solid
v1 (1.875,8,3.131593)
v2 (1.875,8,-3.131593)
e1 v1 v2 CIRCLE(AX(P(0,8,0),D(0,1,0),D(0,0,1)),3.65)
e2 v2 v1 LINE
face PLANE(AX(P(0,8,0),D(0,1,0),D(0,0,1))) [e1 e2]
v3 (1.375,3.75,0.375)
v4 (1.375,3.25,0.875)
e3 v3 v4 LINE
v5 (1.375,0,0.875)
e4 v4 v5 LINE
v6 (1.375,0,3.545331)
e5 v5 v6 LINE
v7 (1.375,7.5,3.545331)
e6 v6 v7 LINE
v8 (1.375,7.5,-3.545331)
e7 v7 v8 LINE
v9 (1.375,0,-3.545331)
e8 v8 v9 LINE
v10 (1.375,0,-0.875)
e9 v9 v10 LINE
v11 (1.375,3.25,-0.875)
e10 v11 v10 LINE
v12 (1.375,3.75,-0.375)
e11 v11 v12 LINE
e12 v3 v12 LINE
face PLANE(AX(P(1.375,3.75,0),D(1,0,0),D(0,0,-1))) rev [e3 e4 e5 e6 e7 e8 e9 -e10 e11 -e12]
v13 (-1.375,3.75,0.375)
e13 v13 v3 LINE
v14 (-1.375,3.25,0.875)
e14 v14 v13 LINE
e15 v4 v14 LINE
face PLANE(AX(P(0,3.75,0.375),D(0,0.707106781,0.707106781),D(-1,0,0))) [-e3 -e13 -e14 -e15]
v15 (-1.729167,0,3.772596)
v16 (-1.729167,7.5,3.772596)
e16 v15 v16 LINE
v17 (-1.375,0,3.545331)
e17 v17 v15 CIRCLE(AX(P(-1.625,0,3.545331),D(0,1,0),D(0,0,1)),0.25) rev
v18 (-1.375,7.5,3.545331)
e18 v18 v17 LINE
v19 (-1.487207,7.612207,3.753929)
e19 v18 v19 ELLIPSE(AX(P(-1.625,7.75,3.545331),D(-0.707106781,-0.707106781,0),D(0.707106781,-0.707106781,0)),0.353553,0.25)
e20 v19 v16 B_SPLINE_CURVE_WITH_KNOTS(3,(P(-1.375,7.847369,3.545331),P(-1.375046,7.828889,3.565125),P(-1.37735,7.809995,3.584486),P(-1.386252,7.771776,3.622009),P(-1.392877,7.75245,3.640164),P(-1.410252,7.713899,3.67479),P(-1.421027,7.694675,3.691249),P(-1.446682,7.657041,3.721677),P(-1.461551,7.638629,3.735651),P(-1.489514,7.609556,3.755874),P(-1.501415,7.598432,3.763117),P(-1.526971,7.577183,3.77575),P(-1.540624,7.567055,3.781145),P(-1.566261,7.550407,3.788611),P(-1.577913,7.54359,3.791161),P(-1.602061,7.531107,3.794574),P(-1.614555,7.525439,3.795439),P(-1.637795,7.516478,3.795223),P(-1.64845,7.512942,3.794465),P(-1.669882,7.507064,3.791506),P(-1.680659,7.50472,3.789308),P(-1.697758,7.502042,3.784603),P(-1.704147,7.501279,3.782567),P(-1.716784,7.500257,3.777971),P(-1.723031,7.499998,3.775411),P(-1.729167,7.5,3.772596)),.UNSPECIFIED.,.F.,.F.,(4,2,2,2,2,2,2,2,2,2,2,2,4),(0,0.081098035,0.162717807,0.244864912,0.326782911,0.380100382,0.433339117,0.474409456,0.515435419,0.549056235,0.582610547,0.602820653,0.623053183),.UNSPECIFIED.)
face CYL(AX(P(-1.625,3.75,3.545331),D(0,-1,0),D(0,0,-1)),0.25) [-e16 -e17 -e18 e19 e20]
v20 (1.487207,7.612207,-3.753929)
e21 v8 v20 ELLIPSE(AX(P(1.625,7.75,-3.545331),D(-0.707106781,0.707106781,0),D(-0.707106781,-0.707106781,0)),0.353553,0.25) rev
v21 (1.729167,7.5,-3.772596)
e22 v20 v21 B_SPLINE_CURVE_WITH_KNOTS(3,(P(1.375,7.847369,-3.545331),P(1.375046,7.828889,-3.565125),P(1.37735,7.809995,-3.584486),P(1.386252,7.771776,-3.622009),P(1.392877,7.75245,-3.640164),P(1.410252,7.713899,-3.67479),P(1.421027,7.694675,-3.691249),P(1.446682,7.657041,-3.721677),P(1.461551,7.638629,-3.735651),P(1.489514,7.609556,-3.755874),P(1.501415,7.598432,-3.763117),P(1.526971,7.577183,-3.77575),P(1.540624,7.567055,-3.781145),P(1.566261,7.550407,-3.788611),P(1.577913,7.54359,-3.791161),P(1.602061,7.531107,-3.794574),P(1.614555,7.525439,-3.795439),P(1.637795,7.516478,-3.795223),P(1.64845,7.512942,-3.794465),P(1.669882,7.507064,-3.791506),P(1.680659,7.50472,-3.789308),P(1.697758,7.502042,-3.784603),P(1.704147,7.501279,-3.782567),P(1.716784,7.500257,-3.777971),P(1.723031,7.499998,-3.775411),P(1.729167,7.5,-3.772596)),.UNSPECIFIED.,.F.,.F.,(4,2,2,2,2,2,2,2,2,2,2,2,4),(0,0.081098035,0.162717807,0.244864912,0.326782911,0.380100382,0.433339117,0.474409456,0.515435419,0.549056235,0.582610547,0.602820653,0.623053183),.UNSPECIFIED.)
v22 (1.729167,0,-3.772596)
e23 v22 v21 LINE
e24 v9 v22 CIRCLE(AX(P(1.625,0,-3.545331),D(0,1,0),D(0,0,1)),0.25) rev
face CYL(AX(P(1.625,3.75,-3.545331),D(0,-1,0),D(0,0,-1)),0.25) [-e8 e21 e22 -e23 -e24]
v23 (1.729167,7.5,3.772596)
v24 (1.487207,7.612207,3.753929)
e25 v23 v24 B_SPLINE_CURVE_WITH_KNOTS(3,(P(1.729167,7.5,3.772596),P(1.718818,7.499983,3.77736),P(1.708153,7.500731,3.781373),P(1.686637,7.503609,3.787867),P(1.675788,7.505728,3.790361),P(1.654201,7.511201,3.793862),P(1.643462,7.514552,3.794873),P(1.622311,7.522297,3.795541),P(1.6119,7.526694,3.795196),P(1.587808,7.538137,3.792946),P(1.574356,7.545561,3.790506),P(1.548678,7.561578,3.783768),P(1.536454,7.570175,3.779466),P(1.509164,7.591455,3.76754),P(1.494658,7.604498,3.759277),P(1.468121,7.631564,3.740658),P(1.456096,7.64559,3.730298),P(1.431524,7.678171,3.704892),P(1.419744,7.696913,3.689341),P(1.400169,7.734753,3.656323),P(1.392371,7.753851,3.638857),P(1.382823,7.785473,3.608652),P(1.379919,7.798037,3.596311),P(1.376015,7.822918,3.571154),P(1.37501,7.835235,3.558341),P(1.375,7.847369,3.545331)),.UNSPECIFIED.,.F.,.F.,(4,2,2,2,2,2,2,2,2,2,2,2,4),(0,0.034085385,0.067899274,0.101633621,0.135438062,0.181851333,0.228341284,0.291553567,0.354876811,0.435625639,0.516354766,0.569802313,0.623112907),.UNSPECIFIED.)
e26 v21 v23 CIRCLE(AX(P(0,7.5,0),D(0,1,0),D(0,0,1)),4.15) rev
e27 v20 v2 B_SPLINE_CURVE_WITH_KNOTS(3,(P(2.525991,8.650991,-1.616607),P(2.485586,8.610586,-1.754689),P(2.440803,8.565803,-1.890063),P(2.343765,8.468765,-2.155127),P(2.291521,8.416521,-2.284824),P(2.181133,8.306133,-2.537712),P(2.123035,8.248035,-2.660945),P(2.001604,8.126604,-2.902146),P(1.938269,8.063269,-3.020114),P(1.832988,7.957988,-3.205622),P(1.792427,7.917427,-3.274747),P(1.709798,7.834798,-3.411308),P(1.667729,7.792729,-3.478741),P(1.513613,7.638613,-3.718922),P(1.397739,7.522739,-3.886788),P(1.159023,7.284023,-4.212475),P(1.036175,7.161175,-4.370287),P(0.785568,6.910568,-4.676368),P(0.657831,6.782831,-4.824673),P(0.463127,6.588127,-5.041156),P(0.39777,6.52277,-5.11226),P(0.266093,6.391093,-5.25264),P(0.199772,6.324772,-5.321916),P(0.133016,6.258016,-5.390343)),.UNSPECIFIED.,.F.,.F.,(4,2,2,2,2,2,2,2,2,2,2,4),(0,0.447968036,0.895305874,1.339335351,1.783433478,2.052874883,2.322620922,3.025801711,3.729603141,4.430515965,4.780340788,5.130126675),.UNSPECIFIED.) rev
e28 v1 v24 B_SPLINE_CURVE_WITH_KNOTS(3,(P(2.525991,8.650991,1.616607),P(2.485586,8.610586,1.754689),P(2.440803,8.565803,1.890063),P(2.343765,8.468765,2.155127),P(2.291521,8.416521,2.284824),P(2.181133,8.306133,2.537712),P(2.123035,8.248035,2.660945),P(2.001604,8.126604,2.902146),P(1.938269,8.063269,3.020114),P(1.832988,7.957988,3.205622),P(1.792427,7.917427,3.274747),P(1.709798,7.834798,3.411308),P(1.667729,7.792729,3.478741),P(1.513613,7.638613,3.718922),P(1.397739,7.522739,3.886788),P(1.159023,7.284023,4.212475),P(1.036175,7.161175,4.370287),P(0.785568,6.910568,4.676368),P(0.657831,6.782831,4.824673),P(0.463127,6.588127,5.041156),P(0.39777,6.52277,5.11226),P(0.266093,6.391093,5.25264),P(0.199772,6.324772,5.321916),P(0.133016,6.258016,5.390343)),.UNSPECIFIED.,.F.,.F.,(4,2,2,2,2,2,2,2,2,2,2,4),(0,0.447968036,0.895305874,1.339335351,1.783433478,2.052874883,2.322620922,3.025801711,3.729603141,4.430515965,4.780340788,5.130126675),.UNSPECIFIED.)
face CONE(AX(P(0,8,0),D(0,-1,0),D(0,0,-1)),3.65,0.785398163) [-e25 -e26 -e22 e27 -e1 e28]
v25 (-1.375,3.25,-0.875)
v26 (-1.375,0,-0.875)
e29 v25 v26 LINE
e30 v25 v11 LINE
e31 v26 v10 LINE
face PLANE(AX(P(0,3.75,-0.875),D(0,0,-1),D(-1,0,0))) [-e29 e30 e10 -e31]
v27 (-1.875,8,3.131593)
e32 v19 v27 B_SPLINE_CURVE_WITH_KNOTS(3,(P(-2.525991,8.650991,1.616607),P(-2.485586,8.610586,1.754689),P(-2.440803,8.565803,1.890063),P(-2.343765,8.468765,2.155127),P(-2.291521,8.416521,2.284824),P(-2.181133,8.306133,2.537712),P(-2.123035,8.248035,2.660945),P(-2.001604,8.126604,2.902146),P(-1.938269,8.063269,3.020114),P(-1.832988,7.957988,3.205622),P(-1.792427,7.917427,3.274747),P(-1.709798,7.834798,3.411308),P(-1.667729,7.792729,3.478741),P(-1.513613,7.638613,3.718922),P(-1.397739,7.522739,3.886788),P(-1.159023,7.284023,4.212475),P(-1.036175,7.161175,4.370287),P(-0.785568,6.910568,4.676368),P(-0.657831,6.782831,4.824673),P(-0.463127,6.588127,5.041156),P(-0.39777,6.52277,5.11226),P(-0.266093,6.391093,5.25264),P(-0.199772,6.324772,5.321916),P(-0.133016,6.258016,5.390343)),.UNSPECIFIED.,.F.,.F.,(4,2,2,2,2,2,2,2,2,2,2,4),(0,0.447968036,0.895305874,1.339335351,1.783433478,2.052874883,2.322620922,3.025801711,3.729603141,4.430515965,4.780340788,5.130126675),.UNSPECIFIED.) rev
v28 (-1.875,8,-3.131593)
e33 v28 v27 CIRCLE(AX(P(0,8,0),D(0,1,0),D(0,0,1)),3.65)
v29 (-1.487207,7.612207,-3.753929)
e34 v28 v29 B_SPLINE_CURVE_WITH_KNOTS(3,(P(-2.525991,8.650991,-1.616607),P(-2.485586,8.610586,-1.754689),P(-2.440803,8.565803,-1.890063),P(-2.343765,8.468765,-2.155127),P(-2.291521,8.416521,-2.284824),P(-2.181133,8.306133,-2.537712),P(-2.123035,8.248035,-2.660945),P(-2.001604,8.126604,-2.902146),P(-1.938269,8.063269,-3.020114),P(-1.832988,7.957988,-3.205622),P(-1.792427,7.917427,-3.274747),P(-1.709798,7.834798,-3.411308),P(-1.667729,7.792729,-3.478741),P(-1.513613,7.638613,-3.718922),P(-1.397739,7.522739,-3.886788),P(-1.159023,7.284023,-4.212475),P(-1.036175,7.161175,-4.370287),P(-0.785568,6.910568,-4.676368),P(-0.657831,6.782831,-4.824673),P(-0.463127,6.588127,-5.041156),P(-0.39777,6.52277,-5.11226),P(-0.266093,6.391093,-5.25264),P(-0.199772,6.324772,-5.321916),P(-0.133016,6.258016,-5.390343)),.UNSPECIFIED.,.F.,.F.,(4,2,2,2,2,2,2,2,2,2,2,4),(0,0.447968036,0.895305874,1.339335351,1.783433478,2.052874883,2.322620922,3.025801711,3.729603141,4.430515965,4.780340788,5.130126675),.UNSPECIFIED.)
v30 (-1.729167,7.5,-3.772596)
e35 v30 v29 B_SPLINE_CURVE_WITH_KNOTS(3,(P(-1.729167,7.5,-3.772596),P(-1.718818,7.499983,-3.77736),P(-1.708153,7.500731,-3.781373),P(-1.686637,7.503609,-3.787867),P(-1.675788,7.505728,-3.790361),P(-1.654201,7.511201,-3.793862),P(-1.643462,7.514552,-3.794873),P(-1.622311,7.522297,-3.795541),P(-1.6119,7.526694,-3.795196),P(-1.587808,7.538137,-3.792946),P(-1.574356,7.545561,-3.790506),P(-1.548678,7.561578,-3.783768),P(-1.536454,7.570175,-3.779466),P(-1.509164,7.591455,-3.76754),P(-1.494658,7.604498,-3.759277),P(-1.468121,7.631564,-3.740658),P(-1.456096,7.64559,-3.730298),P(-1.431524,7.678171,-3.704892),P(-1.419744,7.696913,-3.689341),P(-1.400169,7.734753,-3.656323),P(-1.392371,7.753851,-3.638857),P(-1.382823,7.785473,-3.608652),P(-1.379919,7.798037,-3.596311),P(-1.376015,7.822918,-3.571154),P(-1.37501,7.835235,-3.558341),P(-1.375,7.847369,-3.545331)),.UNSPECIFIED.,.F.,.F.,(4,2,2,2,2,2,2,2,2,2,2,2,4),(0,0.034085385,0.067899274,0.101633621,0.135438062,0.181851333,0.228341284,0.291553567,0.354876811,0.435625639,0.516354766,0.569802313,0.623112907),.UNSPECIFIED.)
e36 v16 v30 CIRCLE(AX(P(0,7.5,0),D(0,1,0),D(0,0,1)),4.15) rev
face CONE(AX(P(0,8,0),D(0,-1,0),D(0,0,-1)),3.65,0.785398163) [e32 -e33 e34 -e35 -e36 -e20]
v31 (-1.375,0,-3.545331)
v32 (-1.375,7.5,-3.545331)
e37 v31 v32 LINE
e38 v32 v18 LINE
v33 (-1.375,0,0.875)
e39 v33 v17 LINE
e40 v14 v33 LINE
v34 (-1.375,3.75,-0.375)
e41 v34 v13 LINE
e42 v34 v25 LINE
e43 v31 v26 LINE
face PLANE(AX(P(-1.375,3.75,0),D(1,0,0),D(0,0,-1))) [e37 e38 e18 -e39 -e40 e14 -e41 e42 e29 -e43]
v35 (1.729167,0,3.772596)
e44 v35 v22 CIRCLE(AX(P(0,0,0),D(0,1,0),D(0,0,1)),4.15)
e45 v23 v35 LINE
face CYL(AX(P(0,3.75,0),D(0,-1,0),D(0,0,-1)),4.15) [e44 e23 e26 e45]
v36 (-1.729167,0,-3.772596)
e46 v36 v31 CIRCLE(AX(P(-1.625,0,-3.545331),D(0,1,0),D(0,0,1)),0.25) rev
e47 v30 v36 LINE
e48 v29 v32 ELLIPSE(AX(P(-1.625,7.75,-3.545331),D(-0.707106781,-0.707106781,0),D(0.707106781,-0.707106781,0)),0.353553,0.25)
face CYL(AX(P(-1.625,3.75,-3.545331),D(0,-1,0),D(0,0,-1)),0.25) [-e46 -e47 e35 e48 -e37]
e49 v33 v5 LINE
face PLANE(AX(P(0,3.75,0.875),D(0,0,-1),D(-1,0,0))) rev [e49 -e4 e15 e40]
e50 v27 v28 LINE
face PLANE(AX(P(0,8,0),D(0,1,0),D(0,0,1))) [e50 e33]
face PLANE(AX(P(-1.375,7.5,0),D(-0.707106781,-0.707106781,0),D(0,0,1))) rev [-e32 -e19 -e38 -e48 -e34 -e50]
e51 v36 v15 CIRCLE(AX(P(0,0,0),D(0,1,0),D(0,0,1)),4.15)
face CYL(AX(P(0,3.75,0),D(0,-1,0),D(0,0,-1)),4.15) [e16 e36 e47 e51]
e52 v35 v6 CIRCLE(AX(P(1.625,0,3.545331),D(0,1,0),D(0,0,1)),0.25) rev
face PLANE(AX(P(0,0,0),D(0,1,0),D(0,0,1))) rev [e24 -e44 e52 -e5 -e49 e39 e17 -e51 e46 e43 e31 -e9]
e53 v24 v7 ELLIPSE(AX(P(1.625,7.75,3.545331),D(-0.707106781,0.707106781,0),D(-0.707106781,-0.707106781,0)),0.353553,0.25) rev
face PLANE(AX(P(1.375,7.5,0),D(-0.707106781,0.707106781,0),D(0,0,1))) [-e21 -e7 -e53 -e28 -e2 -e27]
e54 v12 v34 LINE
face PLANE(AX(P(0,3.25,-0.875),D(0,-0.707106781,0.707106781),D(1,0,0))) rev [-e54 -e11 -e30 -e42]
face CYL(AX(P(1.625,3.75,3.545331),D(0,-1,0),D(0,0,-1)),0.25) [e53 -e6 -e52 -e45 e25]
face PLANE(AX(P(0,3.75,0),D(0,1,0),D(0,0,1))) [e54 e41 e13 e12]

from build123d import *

# Parameters (mm, degrees)
SKETCH1_W           = 2.75
SKETCH1_H           = 1.75
BOSS_EXTRUDE1_DEPTH = 3.75
BOSS_EXTRUDE2_DEPTH = 4.25
FILLET1_R           = 0.25
CHAMFER1_SIZE       = 0.5


with BuildPart() as part:
    # Sketch1 → Boss-Extrude1 (new body)
    with BuildSketch(Plane(origin=(0, 0, 0), x_dir=(1, 0, 0), z_dir=(0, 1, 0))):
        with BuildLine():
            Line((-1.375, 0.875), (-1.375, 3.915593825))
            ThreePointArc((-1.375, 3.915593825), (-4.15, 0), (-1.375, -3.915593825))
            Line((-1.375, -3.915593825), (-1.375, -0.875))
            Line((-1.375, -0.875), (-1.375, 0.875))
        make_face()
        with BuildLine():
            ThreePointArc((4.15, 0), (3.385908298, 2.399609343), (1.375, 3.915593825))
            Line((1.375, 3.915593825), (1.375, 0.875))
            Line((1.375, 0.875), (1.375, -0.875))
            Line((1.375, -0.875), (1.375, -3.915593825))
            ThreePointArc((1.375, -3.915593825), (3.385908298, -2.399609343), (4.15, 0))
        make_face()
        Rectangle(SKETCH1_W, SKETCH1_H)
    extrude(amount=BOSS_EXTRUDE1_DEPTH)

    # Sketch2 → Boss-Extrude2 (add)
    with BuildSketch(Plane(origin=(0, 3.75, 0), x_dir=(1, 0, 0), z_dir=(0, 1, 0))):
        with BuildLine():
            Line((1.375, -0.875), (1.375, 0.875))
            Line((1.375, 0.875), (1.375, 3.915593825))
            ThreePointArc((1.375, 3.915593825), (4.15, 0), (1.375, -3.915593825))
            Line((1.375, -3.915593825), (1.375, -0.875))
        make_face()
        with BuildLine():
            Line((-1.375, 0.875), (-1.375, -0.875))
            Line((-1.375, -0.875), (-1.375, -3.915593825))
            ThreePointArc((-1.375, -3.915593825), (-4.15, 0), (-1.375, 3.915593825))
            Line((-1.375, 3.915593825), (-1.375, 0.875))
        make_face()
    extrude(amount=BOSS_EXTRUDE2_DEPTH)

    # Fillet1
    fillet1_edges = [part.edges().sort_by_distance(p)[0] for p in [
        (1.375, 4, -3.915593825),
        (1.375, 4, 3.915593825),
        (-1.375, 4, 3.915593825),
        (-1.375, 4, -3.915593825),
    ]]
    fillet(fillet1_edges, radius=FILLET1_R)

    # Chamfer1
    # the kernel refuses this chamfer: 0.5 mm, written as the material it takes off along each edge
    with BuildSketch(Plane(origin=(0, 8, 0), x_dir=(0.11938589143460555, 0, -0.99284792839909), z_dir=(-0.99284792839909, 0, -0.11938589143460555))) as chamfer1_piece_1:
        Polygon((4.15, CHAMFER1_SIZE), (4.15 - CHAMFER1_SIZE, 0), (4.15, 0), align=None)
    revolve(axis=Axis((0, 8, 0), (0, -1, 0)), revolution_arc=166.286676069, mode=Mode.SUBTRACT)
    with BuildSketch(Plane(origin=(1.375, 8, 4.831172931), x_dir=(-0.02749587661058651, -0.9996219169112968, 0), z_dir=(0, 0, -1)), Plane(origin=(-1.375, 8, -4.831172931), x_dir=(0.02749587661058651, -0.9996219169112968, 0), z_dir=(0, 0, 1))) as chamfer1_piece_2:
        Polygon((CHAMFER1_SIZE * 0.999621916911, -CHAMFER1_SIZE * 0.0274958766106), (-CHAMFER1_SIZE * 0.0274958766106, -CHAMFER1_SIZE * 0.999621916911), (0, 0), align=None)
    extrude(amount=9.662345862, mode=Mode.SUBTRACT)
    with BuildSketch(Plane(origin=(0, 8, 0), x_dir=(-0.11938589143460458, 0, 0.9928479283990902), z_dir=(0.9928479283990902, 0, 0.11938589143460458))) as chamfer1_piece_3:
        Polygon((4.15 - CHAMFER1_SIZE, 0), (4.15, CHAMFER1_SIZE), (4.15, 0), align=None)
    revolve(axis=Axis((0, 8, 0), (0, -1, 0)), revolution_arc=166.286676069, mode=Mode.SUBTRACT)
    with BuildSketch(Plane(origin=(-1.375, 3.75, 0.875), x_dir=(0, -0.9996219169112968, 0.02749587661058627), z_dir=(1, 0, 0))) as chamfer1_piece_4:
        Polygon((CHAMFER1_SIZE * 0.999621916911, CHAMFER1_SIZE * 0.0274958766106), (-CHAMFER1_SIZE * 0.0274958766106, CHAMFER1_SIZE * 0.999621916911), (0, 0), align=None)
    extrude(amount=2.75, mode=Mode.SUBTRACT)
    with BuildSketch(Plane(origin=(1.375, 3.75, -0.875), x_dir=(0, 0.027495876610586487, 0.9996219169112968), z_dir=(-1, 0, 0))) as chamfer1_piece_5:
        Polygon((CHAMFER1_SIZE * 0.999621916911, -CHAMFER1_SIZE * 0.0274958766106), (-CHAMFER1_SIZE * 0.0274958766106, -CHAMFER1_SIZE * 0.999621916911), (0, 0), align=None)
    extrude(amount=2.75, mode=Mode.SUBTRACT)


solid = part.part
